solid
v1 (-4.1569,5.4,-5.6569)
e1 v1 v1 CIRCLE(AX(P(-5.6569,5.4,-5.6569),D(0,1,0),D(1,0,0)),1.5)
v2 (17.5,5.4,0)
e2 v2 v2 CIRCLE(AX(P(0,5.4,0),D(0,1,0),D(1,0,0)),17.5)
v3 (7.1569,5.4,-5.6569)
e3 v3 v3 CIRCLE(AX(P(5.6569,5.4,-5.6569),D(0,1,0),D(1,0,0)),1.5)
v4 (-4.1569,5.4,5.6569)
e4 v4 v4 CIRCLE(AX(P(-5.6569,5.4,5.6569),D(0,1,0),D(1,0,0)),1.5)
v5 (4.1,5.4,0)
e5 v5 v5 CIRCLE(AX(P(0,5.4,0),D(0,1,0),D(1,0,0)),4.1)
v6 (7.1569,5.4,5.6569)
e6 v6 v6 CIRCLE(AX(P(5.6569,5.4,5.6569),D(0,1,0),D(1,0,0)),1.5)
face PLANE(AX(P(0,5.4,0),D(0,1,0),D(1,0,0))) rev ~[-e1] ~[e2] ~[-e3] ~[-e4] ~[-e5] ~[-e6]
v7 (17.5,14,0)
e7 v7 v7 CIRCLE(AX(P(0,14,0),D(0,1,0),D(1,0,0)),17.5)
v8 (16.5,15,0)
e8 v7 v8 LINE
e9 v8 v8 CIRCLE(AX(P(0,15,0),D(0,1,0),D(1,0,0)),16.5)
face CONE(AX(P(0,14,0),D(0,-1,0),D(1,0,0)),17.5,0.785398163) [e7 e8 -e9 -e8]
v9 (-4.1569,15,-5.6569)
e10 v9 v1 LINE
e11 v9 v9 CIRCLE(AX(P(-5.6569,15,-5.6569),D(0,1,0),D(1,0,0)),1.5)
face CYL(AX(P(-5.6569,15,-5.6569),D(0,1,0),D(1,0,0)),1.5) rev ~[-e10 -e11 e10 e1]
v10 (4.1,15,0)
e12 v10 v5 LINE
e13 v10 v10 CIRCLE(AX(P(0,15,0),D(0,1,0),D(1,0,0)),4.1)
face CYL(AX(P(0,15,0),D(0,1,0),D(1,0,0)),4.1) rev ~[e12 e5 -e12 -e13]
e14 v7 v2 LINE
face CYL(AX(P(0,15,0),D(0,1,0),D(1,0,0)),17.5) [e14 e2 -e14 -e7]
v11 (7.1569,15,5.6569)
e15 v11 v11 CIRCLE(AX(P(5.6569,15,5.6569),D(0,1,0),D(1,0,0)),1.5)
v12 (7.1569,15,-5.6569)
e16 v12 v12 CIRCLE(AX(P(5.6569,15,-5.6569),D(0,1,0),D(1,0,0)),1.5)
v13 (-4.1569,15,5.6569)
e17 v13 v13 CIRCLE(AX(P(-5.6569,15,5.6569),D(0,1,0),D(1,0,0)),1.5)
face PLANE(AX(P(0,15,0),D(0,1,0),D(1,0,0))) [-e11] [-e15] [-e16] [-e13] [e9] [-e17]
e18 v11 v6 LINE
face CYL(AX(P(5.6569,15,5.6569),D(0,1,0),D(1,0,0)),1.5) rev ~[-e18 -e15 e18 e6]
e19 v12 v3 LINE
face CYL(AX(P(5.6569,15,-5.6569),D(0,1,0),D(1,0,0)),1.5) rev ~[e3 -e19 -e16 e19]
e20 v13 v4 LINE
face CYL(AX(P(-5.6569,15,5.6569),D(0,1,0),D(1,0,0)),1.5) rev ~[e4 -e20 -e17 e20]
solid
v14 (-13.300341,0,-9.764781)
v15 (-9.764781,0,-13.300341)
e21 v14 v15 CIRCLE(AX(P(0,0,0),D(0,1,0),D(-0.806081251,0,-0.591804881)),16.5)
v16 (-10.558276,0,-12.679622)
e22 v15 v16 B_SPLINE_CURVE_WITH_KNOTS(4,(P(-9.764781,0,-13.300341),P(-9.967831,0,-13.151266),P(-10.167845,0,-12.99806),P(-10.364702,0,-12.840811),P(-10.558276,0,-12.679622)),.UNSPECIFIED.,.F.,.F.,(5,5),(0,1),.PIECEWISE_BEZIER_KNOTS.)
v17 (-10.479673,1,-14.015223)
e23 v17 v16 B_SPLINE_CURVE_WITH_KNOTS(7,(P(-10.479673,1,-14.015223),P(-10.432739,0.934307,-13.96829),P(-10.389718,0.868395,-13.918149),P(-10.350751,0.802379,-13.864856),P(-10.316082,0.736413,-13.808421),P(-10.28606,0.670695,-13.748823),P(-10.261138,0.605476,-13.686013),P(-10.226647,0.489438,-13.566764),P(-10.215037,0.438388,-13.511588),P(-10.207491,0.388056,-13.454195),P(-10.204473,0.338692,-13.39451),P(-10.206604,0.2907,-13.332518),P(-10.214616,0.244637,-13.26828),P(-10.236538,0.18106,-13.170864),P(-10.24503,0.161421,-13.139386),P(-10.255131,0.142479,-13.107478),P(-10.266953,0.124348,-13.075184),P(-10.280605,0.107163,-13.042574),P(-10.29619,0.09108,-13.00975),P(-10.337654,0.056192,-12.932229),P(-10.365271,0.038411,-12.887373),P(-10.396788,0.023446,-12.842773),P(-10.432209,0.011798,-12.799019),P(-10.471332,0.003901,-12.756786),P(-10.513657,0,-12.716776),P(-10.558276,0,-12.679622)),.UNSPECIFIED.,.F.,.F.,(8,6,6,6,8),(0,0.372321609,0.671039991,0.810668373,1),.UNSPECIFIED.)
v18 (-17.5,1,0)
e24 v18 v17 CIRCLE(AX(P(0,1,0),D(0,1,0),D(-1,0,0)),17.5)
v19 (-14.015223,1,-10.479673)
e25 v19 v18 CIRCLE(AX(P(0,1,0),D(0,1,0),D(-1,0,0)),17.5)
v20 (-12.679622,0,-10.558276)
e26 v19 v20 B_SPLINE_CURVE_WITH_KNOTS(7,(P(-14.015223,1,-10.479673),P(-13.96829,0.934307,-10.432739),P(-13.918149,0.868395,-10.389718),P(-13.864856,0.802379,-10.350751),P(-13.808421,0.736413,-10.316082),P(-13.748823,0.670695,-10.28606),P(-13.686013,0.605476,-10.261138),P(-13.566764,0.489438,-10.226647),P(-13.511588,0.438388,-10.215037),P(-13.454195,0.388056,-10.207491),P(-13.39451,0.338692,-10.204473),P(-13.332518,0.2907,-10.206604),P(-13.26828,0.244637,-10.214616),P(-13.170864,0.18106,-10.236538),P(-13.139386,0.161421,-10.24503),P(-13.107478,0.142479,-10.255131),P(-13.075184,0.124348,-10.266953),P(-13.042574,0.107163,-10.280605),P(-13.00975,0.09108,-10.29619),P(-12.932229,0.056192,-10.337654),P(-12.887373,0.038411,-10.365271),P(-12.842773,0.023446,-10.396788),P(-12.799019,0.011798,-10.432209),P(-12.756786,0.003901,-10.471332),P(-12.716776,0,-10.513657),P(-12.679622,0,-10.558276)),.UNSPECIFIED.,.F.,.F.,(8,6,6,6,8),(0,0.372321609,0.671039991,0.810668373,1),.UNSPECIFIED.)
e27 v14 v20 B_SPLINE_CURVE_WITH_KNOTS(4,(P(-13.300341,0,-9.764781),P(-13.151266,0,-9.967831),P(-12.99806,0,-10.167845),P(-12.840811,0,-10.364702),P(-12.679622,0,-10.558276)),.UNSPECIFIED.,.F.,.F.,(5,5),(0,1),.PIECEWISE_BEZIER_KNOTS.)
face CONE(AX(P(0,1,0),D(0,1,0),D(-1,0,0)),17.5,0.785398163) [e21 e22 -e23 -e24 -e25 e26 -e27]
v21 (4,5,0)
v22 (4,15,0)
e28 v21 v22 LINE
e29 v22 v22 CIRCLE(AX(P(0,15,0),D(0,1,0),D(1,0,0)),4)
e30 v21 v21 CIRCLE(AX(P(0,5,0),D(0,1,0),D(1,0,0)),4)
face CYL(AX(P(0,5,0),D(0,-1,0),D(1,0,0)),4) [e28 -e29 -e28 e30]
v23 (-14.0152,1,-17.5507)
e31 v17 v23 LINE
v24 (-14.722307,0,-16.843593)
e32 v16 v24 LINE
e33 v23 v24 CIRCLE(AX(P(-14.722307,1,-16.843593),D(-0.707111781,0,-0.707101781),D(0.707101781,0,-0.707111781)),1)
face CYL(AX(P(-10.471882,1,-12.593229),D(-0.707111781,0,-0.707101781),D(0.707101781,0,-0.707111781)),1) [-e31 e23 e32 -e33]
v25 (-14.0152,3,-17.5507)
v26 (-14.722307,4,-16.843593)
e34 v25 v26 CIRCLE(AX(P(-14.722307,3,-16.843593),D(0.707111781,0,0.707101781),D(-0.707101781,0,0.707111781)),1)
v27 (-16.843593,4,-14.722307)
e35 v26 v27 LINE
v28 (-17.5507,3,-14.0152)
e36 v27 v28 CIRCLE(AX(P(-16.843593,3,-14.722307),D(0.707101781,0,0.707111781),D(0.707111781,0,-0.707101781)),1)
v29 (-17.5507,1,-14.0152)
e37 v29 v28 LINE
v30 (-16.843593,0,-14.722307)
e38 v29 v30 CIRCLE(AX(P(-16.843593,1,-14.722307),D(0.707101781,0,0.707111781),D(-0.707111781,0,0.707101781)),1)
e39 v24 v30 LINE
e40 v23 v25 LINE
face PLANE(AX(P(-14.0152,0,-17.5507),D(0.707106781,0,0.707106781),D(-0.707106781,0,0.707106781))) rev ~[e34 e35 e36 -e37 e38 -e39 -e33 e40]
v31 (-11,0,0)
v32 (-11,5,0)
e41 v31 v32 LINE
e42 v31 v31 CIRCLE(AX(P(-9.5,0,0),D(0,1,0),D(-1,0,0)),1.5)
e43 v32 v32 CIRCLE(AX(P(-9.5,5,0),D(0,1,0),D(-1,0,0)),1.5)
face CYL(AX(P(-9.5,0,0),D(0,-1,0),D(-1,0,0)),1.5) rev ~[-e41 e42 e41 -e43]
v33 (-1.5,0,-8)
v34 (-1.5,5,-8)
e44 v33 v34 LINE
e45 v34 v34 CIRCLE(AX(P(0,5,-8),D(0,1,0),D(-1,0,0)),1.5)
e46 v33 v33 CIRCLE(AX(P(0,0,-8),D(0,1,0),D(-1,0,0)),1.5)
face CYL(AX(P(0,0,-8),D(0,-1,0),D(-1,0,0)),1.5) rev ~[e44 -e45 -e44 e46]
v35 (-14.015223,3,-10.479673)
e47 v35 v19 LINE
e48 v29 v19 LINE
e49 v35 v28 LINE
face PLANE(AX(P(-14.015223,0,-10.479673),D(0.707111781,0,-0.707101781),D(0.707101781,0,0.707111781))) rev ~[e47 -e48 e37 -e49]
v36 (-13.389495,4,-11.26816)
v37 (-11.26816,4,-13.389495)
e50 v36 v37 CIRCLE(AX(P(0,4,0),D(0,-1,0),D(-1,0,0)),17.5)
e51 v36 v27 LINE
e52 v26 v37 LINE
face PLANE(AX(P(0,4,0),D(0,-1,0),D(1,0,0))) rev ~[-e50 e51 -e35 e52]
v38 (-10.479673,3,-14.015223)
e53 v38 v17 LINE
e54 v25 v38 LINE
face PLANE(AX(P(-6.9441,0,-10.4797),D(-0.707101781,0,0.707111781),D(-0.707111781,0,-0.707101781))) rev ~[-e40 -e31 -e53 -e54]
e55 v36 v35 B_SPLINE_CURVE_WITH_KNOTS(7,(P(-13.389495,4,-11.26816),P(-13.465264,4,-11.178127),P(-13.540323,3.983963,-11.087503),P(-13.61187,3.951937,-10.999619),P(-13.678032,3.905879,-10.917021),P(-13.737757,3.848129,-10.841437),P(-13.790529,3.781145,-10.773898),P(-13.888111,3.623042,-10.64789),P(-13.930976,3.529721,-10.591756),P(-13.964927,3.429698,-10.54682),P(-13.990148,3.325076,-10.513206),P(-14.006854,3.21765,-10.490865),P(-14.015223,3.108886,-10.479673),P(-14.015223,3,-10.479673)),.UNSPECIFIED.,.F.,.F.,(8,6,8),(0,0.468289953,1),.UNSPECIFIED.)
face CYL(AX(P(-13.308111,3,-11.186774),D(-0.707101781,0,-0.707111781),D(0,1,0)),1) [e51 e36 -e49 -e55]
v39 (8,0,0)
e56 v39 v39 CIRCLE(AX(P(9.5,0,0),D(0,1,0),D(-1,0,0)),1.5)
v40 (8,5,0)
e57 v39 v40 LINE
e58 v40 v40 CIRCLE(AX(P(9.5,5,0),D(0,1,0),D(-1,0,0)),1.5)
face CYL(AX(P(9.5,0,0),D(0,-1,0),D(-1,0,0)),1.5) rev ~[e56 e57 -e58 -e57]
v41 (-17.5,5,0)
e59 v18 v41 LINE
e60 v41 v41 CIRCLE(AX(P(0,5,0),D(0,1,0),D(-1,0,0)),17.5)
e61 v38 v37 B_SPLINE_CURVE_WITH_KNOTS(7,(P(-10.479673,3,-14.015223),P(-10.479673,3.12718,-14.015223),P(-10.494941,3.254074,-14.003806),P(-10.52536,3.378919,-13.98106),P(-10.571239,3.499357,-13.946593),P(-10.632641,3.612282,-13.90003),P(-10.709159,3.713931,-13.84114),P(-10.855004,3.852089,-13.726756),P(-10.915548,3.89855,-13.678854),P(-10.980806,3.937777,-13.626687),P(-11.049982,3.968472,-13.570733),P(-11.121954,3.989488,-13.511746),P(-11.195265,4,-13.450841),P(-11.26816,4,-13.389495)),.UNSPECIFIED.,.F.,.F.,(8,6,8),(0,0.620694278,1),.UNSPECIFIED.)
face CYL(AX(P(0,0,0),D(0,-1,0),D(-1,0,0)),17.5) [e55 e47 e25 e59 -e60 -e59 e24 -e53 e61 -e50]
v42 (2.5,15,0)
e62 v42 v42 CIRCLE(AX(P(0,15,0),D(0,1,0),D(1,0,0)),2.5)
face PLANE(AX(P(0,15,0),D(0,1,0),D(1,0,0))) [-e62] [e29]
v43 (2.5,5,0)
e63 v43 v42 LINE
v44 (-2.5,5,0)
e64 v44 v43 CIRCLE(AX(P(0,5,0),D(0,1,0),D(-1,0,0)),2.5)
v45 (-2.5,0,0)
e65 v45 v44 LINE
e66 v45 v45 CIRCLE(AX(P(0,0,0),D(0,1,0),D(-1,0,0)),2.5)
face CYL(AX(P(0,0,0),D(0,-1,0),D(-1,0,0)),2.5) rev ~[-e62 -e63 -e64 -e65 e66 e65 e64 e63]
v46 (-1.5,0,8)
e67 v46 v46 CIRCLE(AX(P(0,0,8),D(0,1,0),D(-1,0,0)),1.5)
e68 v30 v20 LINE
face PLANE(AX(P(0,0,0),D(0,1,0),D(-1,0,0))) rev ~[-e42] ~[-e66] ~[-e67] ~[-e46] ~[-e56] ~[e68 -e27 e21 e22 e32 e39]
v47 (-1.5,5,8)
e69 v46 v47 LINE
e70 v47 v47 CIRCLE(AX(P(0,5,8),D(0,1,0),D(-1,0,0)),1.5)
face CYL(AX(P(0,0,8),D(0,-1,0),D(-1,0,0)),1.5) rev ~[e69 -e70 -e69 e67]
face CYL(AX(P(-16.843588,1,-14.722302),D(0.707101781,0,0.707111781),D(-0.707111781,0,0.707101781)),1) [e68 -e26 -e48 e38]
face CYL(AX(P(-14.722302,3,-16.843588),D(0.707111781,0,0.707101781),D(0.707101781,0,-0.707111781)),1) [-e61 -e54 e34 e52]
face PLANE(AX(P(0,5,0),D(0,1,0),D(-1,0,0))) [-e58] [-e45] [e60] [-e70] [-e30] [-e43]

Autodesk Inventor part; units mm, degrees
ref_plane "YZ Plane" through (0, 0, 0) normal (1, 0, 0) x (0, 1, 0)
ref_plane "XZ Plane" through (0, 0, 0) normal (0, 1, 0) x (-1, 0, 0)
ref_plane "XY Plane" through (0, 0, 0) normal (0, 0, 1) x (1, 0, 0)
sketch "Sketch1" plane through (0, 0, 0) normal (0, 1, 0) x (-1, 0, 0)
  circle A0 centre (0, 0) radius 17.5
  circle A1 centre (0, 0) radius 2.5
  circle A2 centre (9.5, 0) radius 1.5
  circle A3 centre (0, -8) radius 1.5
  circle A4 centre (-9.5, 0) radius 1.5
  circle A5 centre (0, 8) radius 1.5
  dimension "d0" = 35
  dimension "d1" = 5
  dimension "d2" = 3
  dimension "d3" = 16
  dimension "d4" = 8
  dimension "d5" = 19
  dimension "d6" = 9.5
extrude "Extrusion1" add sketch "Sketch1" along normal blind 5
sketch "Sketch2" plane through (0, 5, 0) normal (0, 1, 0) x (1, 0, 0)
  circle A0 centre (0, 0) radius 4
  circle A1 centre (0, 0) radius 2.5
  dimension "d9" = 8
  dimension "d10" = 5
extrude "Extrusion2" add sketch "Sketch2" along normal blind 10
chamfer "Chamfer1" distance 1 angle 45 1 edges at (17.5, 0, 0)
sketch "Sketch3" plane through (0, 15, 0) normal (0, 1, 0) x (1, 0, 0)
  circle A0 centre (0, 0) radius 17.5
  circle A1 centre (0, 0) radius 4.1
  circle A2 centre (0, 0) radius 2.5 construction
  circle A3 centre (0, 0) radius 8 construction
  circle A4 centre (-5.6569, -5.6569) radius 1.5
  circle A5 centre (-5.6569, 5.6569) radius 1.5
  circle A6 centre (5.6569, 5.6569) radius 1.5
  circle A7 centre (5.6569, -5.6569) radius 1.5
  dimension "d16" = 35
  dimension "d17" = 8.2
  dimension "d18" = 16
  dimension "d19" = 3
  dimension "d20" = 90
extrude "Extrusion3" add sketch "Sketch3" against normal blind 9.6
chamfer "Chamfer2" distance 1 angle 45 1 edges at (-17.5, 15, 0)
sketch "Sketch4" plane through (0, 0, 0) normal (0, -1, 0) x (1, 0, 0)
  line L0 (-10.4797, -6.9441) -> (-6.9441, -10.4797)
  line L1 (-10.4797, -6.9441) -> (-5.4797, -6.9441) construction
  line L2 (-6.9441, -10.4797) -> (-14.0152, -17.5507)
  line L3 (-14.0152, -17.5507) -> (-17.5507, -14.0152)
  line L4 (-17.5507, -14.0152) -> (-10.4797, -6.9441)
  line L5 (-15.783, -15.783) -> (0, 0) construction
  circle A0 centre (0, 0) radius 17.5 projected
  point P0 (-14.0152, -10.4797)
  dimension "d26" = 45
  dimension "d27" = 5
  dimension "d28" = 10
extrude "Extrusion4" add sketch "Sketch4" against normal blind 4 contours L0 L2 A0 L4 | A0 L2 L3 L4 picked at (-10.125, -9.731)
fillet "Fillet1" radius 1 4 edges at (-15.4255, 0, -11.89) (-15.783, 4, -12.2474) (-11.89, 0, -15.4255) (-12.2474, 4, -15.783)
properties part number "Motor"
